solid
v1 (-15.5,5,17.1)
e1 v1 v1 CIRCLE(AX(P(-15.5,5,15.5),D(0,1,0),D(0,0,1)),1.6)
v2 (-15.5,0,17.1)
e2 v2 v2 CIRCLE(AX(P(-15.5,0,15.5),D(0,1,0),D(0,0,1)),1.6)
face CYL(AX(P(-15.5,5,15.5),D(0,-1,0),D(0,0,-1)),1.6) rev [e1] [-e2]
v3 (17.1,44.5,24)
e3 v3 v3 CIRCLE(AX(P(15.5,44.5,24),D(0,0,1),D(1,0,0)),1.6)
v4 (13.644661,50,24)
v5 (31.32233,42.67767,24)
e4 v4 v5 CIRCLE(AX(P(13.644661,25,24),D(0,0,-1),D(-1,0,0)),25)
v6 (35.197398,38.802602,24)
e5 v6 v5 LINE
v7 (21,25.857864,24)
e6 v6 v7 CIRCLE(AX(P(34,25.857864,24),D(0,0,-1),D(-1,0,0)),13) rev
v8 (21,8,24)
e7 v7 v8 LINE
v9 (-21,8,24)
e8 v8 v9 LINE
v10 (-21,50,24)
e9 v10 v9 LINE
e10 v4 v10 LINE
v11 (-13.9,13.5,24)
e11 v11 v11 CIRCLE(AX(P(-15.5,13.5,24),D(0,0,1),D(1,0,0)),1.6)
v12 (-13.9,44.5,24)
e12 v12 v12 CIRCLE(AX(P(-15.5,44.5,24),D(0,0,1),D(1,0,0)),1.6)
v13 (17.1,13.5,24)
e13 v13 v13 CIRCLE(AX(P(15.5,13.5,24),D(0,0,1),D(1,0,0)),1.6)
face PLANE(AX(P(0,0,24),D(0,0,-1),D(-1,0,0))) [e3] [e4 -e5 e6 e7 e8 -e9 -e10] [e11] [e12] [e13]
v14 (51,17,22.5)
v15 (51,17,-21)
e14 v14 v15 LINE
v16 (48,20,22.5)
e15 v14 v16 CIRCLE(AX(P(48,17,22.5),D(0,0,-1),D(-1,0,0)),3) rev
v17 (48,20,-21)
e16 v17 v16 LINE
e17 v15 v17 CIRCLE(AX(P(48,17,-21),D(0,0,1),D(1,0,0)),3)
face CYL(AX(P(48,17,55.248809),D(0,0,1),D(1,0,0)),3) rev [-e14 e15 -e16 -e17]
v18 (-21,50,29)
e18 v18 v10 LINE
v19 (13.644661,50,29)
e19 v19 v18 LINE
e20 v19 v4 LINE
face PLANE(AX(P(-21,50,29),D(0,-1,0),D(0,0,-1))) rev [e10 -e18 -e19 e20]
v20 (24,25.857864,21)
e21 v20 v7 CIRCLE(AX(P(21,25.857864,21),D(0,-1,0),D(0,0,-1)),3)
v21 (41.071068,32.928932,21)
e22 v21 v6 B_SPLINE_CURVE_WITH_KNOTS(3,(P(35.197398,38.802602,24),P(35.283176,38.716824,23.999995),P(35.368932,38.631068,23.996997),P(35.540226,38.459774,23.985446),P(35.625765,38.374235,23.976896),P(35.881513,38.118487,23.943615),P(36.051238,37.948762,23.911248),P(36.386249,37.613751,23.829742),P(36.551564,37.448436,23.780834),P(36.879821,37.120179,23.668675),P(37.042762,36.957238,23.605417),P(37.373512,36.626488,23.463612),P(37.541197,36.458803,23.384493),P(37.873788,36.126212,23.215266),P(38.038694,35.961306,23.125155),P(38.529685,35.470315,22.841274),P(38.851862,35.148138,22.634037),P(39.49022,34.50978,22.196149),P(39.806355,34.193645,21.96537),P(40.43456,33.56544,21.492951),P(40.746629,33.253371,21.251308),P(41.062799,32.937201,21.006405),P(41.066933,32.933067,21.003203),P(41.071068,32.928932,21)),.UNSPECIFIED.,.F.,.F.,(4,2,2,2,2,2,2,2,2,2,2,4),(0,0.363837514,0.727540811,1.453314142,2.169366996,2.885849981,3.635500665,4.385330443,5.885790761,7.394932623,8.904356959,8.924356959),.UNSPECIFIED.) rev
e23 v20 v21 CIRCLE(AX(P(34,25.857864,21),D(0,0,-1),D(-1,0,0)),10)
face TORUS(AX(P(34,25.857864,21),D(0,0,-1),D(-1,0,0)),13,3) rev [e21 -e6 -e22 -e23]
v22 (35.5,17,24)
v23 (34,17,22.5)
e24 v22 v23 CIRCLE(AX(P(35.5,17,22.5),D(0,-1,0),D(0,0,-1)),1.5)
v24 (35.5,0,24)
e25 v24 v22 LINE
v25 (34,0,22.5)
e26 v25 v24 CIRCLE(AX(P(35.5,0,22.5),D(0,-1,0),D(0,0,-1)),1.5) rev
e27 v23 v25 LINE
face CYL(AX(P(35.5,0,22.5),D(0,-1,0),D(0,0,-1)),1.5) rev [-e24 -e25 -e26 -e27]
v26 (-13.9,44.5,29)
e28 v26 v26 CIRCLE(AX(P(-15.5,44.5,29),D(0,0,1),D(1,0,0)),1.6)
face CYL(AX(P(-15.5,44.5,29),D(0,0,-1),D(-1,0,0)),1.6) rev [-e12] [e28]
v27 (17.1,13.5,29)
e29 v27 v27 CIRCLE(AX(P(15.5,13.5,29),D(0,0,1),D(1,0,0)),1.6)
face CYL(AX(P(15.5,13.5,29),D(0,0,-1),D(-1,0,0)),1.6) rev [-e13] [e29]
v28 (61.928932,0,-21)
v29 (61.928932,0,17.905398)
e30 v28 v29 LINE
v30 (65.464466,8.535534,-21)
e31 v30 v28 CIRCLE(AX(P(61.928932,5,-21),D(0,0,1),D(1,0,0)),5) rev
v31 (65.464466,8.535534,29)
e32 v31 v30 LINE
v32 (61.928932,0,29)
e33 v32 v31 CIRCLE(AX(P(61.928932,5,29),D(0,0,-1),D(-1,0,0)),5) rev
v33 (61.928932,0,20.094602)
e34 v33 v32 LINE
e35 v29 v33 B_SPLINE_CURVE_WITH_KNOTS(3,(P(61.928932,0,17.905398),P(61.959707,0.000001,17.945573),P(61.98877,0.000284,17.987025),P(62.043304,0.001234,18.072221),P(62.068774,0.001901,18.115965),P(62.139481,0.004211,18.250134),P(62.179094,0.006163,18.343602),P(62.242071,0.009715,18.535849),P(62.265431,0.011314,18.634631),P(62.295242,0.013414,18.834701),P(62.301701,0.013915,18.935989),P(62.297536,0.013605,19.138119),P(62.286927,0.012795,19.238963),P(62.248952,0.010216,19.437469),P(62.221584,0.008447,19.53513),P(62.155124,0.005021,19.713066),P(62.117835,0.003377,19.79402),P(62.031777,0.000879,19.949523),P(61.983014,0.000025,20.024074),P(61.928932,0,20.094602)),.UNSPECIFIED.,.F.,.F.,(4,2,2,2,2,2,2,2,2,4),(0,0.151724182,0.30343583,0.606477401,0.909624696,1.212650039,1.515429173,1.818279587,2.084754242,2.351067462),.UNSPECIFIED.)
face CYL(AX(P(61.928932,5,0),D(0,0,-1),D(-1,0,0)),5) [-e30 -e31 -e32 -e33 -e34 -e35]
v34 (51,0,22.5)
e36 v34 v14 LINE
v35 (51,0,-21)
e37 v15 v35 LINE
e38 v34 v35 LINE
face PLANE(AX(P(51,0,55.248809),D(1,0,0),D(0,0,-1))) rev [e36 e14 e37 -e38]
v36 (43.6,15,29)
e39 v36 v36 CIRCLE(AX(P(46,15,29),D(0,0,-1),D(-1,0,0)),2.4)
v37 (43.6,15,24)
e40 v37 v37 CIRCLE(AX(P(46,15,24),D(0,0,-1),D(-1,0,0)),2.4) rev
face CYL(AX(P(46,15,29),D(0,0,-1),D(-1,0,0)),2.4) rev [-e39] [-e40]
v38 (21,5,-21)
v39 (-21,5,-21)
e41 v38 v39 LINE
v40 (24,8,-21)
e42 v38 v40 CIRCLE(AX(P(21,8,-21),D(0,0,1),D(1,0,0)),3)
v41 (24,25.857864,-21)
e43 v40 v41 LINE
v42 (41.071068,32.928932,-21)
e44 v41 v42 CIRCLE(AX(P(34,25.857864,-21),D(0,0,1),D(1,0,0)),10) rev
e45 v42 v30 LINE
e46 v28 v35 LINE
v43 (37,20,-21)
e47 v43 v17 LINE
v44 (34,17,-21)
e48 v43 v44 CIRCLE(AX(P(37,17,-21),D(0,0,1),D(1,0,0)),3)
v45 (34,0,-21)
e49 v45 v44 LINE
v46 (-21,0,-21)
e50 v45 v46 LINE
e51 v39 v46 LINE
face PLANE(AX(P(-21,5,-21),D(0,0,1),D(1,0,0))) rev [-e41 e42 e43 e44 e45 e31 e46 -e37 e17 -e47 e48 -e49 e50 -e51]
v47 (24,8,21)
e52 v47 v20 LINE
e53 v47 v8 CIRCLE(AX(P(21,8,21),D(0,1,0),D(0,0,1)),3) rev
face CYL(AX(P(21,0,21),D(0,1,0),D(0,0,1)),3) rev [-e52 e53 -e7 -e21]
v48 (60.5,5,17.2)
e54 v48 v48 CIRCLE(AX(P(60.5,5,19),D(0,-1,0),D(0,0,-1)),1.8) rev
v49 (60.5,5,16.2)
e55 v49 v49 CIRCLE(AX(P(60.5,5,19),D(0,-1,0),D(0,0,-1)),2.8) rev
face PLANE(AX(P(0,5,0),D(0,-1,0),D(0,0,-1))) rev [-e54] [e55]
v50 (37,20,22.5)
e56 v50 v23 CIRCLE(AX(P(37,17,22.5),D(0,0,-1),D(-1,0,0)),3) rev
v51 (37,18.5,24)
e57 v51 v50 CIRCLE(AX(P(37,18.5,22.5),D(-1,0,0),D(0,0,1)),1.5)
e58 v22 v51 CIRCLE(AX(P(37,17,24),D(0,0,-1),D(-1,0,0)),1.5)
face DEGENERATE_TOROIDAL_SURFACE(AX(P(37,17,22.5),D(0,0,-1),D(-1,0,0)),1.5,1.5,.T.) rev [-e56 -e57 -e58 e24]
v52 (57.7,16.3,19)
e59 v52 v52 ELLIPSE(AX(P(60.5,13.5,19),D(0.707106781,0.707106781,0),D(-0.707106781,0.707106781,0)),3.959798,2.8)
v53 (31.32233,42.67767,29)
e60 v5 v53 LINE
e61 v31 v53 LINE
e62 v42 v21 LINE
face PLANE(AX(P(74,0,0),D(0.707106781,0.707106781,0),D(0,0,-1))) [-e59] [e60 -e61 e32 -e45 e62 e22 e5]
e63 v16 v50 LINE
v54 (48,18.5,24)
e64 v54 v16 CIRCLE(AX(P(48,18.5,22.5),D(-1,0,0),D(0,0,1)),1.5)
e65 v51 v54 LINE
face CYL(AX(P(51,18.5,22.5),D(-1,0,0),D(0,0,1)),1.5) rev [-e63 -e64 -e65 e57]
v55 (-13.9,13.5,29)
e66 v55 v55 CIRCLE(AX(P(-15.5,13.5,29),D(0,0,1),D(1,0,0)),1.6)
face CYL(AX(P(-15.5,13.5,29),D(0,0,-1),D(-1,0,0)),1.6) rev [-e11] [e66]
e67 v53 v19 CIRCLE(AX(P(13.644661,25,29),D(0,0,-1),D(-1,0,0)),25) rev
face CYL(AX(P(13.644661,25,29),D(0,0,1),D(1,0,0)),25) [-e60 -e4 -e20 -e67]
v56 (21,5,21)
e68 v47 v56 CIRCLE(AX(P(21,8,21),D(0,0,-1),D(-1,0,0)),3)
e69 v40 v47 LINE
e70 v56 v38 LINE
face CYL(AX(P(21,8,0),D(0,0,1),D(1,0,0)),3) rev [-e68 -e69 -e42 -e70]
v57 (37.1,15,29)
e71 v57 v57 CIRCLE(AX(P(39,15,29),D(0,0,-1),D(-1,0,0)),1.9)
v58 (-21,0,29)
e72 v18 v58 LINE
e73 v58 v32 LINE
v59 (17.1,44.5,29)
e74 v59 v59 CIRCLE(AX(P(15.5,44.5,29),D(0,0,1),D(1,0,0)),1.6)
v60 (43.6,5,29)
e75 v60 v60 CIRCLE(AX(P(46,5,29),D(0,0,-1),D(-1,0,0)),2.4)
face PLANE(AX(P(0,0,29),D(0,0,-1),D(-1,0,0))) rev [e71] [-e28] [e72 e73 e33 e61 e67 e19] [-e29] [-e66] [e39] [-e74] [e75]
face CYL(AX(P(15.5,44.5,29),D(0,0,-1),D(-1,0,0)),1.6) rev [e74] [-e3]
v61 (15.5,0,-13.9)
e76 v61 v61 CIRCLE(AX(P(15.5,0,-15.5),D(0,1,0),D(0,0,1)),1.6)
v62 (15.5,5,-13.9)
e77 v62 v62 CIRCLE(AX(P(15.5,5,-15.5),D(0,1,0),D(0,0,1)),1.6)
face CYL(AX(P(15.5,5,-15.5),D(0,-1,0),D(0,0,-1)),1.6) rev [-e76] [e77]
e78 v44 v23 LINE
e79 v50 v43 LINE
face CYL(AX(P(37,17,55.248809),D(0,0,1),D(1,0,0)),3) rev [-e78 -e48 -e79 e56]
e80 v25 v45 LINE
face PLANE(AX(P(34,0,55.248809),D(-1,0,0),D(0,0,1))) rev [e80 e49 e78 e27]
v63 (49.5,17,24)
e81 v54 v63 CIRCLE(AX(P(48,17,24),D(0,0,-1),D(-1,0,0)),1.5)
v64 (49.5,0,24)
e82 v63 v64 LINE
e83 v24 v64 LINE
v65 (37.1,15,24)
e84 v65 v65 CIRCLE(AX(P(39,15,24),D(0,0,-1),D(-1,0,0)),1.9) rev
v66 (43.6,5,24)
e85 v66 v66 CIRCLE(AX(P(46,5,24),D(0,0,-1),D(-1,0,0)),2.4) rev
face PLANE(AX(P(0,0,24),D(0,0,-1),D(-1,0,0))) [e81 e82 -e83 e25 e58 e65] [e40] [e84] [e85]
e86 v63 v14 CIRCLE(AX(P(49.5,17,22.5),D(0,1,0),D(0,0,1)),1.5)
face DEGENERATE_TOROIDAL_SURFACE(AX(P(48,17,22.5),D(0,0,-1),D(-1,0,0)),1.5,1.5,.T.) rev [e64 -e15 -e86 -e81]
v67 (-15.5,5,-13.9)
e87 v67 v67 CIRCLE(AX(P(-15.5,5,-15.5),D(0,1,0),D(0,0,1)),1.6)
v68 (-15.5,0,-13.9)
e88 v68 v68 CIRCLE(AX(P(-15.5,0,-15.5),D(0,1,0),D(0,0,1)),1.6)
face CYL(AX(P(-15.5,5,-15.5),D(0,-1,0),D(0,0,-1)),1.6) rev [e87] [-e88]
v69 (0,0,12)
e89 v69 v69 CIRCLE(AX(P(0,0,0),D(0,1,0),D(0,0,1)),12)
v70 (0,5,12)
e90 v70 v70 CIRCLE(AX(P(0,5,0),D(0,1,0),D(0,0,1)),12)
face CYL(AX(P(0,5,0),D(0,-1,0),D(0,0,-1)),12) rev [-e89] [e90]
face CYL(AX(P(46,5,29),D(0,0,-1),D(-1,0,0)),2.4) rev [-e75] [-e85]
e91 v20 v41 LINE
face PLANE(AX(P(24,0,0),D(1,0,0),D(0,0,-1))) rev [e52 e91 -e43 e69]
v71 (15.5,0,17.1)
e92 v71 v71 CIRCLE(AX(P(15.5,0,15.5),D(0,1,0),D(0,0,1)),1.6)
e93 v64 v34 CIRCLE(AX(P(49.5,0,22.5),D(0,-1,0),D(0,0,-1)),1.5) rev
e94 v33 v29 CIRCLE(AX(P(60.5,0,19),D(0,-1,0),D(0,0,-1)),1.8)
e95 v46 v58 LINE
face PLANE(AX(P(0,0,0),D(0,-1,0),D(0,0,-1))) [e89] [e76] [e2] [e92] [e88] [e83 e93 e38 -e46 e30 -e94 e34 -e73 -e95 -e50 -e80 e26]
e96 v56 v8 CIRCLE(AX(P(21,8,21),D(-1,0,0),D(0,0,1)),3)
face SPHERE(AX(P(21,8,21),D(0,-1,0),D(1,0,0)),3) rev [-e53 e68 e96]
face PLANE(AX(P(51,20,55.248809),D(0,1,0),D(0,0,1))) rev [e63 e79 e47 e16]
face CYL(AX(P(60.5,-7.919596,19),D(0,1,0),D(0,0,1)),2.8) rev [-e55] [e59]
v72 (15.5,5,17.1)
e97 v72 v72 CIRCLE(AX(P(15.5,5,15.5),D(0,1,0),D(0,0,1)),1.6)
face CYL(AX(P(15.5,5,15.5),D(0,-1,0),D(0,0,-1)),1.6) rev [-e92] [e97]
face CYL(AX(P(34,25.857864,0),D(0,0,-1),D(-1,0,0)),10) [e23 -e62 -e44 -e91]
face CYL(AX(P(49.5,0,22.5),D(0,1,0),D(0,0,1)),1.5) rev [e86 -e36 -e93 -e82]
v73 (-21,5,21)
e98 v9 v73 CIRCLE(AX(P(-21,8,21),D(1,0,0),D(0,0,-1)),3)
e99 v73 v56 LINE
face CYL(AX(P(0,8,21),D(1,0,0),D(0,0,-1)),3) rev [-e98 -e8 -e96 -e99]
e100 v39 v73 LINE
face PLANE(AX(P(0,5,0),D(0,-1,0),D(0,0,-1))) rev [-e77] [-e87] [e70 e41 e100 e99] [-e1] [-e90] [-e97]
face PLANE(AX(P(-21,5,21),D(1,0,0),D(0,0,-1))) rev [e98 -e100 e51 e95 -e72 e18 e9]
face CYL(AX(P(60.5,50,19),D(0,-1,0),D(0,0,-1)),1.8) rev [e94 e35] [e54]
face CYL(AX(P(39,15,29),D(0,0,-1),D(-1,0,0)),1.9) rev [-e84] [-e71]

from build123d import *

# Parameters (mm, degrees)
SKETCH_1_R          = 1.6
SKETCH_1_R_2        = 12
EXTRUDE_1_DEPTH     = 5
SKETCH_4_W          = 45
SKETCH_4_H          = 50
SKETCH_4_R          = 1.6
EXTRUDE_4_DEPTH     = 5
SKETCH_5_W          = 50
SKETCH_5_H          = 50
EXTRUDE_5_DEPTH     = 50
SKETCH_6_R          = 2.4
SKETCH_6_R_2        = 1.9
CUT_EXTRUDE_1_DEPTH = 103.352332655
SKETCH_7_R          = 1.8
CUT_EXTRUDE_2_DEPTH = 94.898881782
SKETCH_8_R          = 2.8
CUT_EXTRUDE_3_DEPTH = 45
SKETCH_9_W          = 17
SKETCH_9_H          = 20
CUT_EXTRUDE_4_DEPTH = 45
CHAMFER_1_SIZE      = 50
FILLET_1_R          = 5
FILLET_4_R          = 10
FILLET_5_R          = 25
FILLET_6_R          = 3
FILLET_7_R          = 1.5


with BuildPart() as part:
    # 草图1 → 凸台-拉伸1 (new body)
    with BuildSketch(Plane(origin=(0, 0, 0), x_dir=(1, 0, 0), z_dir=(0, 1, 0))):
        Polygon((24, -24), (24, 21), (21, 21), (-21, 21), (-21, -21), (-21, -24), align=None)
        with Locations(Location((-15.5, 15.5, 0), (0, 0, 270))):
            Circle(SKETCH_1_R, mode=Mode.SUBTRACT)
        with Locations(Location((15.5, 15.5, 0), (0, 0, 270))):
            Circle(SKETCH_1_R, mode=Mode.SUBTRACT)
        with Locations(Location((-15.5, -15.5, 0), (0, 0, 270))):
            Circle(SKETCH_1_R, mode=Mode.SUBTRACT)
        with Locations(Location((15.5, -15.5, 0), (0, 0, 270))):
            Circle(SKETCH_1_R, mode=Mode.SUBTRACT)
        with Locations(Location((0, 0, 0), (0, 0, 270))):
            Circle(SKETCH_1_R_2, mode=Mode.SUBTRACT)
    extrude(amount=EXTRUDE_1_DEPTH)

    # 草图4 → 凸台-拉伸4 (add)
    with BuildSketch(Plane.XY.offset(24)):
        with Locations((1.5, 25)):
            Rectangle(SKETCH_4_W, SKETCH_4_H)
        with Locations((-15.5, 44.5)):
            Circle(SKETCH_4_R, mode=Mode.SUBTRACT)
        with Locations((15.5, 44.5)):
            Circle(SKETCH_4_R, mode=Mode.SUBTRACT)
        with Locations((-15.5, 13.5)):
            Circle(SKETCH_4_R, mode=Mode.SUBTRACT)
        with Locations((15.5, 13.5)):
            Circle(SKETCH_4_R, mode=Mode.SUBTRACT)
    extrude(amount=EXTRUDE_4_DEPTH)

    # 草图5 → 凸台-拉伸5 (add)
    with BuildSketch(Plane(origin=(24, 0, 0), x_dir=(0, 0, -1), z_dir=(1, 0, 0))):
        with Locations((-4, 25)):
            Rectangle(SKETCH_5_W, SKETCH_5_H)
    extrude(amount=EXTRUDE_5_DEPTH)

    # 草图6 → 切除-拉伸1 (cut, through all)
    with BuildSketch(Plane(origin=(0, 0, -21), x_dir=(-1, 0, 0), z_dir=(0, 0, -1))):
        with Locations((-46, 5)):
            Circle(SKETCH_6_R)
        with Locations((-46, 15)):
            Circle(SKETCH_6_R)
        with Locations((-39, 15)):
            Circle(SKETCH_6_R_2)
    extrude(amount=-CUT_EXTRUDE_1_DEPTH, mode=Mode.SUBTRACT)

    # 草图7 → 切除-拉伸2 (cut, through all)
    with BuildSketch(Plane.XZ):
        with Locations(Location((60.5, 19, 0), (0, 0, 270))):
            Circle(SKETCH_7_R)
    extrude(amount=-CUT_EXTRUDE_2_DEPTH, mode=Mode.SUBTRACT)

    # 草图8 → 切除-拉伸3 (cut)
    with BuildSketch(Plane(origin=(0, 50, 0), x_dir=(1, 0, 0), z_dir=(0, 1, 0))):
        with Locations(Location((60.5, -19, 0), (0, 0, 270))):
            Circle(SKETCH_8_R)
    extrude(amount=-CUT_EXTRUDE_3_DEPTH, mode=Mode.SUBTRACT)

    # 草图9 → 切除-拉伸4 (cut)
    with BuildSketch(Plane(origin=(0, 0, -21), x_dir=(-1, 0, 0), z_dir=(0, 0, -1))):
        with Locations((-42.5, 10)):
            Rectangle(SKETCH_9_W, SKETCH_9_H)
    extrude(amount=-CUT_EXTRUDE_4_DEPTH, mode=Mode.SUBTRACT)

    # 倒角1
    # the kernel refuses this chamfer: 50 mm, written as the material it takes off along each edge
    with BuildSketch(Plane(origin=(74, 50, 157.584149398), x_dir=(-0.9996219169112969, 0.027495876610586317, 0), z_dir=(0, 0, -1))) as chamfer_1_piece_1:
        Polygon((CHAMFER_1_SIZE * 0.999621916911, -CHAMFER_1_SIZE * 0.0274958766106), (-CHAMFER_1_SIZE * 0.0274958766106, -CHAMFER_1_SIZE * 0.999621916911), (0, 0), align=None)
    extrude(amount=307.168298797, mode=Mode.SUBTRACT)

    # 圆角1
    # the kernel refuses this fillet: 5 mm, written as the material it takes off along each edge
    with BuildSketch(Plane(origin=(74, 0, -51.17766953), x_dir=(-0.707106781186265, 0.7071067811868301, 0), z_dir=(0, 0, 1))) as fillet_1_piece_1:
        with BuildLine():
            CenterArc((FILLET_1_R * 2.41421356237, FILLET_1_R), FILLET_1_R, 135, 135)
            Line((FILLET_1_R * 1.70710678118, FILLET_1_R * 1.70710678119), (0, 0))
            Line((0, 0), (FILLET_1_R * 2.41421356237, 0))
        make_face()
    extrude(amount=110.355339059, mode=Mode.SUBTRACT)

    # 圆角4
    fillet_4_edges = [part.edges().sort_by_distance(p)[0] for p in [
        (24, 50, 1.5),
    ]]
    fillet(fillet_4_edges, radius=FILLET_4_R)

    # 圆角5
    fillet_5_edges = [part.edges().sort_by_distance(p)[0] for p in [
        (24, 50, 26.5),
    ]]
    fillet(fillet_5_edges, radius=FILLET_5_R)

    # 圆角6
    fillet_6_edges = [part.edges().sort_by_distance(p)[0] for p in [
        (30.173165676, 35.096659701, 24),
        (24, 15.428932188, 24),
        (1.5, 5, 24),
        (24, 5, 1.5),
        (34, 20, 1.5),
        (51, 20, 1.5),
    ]]
    fillet(fillet_6_edges, radius=FILLET_6_R)

    # 圆角7
    fillet_7_edges = [part.edges().sort_by_distance(p)[0] for p in [
        (51, 8.5, 24),
        (42.5, 20, 24),
        (34, 8.5, 24),
        (50.121320344, 19.121320344, 24),
        (34.878679656, 19.121320344, 24),
    ]]
    fillet(fillet_7_edges, radius=FILLET_7_R)


solid = part.part
